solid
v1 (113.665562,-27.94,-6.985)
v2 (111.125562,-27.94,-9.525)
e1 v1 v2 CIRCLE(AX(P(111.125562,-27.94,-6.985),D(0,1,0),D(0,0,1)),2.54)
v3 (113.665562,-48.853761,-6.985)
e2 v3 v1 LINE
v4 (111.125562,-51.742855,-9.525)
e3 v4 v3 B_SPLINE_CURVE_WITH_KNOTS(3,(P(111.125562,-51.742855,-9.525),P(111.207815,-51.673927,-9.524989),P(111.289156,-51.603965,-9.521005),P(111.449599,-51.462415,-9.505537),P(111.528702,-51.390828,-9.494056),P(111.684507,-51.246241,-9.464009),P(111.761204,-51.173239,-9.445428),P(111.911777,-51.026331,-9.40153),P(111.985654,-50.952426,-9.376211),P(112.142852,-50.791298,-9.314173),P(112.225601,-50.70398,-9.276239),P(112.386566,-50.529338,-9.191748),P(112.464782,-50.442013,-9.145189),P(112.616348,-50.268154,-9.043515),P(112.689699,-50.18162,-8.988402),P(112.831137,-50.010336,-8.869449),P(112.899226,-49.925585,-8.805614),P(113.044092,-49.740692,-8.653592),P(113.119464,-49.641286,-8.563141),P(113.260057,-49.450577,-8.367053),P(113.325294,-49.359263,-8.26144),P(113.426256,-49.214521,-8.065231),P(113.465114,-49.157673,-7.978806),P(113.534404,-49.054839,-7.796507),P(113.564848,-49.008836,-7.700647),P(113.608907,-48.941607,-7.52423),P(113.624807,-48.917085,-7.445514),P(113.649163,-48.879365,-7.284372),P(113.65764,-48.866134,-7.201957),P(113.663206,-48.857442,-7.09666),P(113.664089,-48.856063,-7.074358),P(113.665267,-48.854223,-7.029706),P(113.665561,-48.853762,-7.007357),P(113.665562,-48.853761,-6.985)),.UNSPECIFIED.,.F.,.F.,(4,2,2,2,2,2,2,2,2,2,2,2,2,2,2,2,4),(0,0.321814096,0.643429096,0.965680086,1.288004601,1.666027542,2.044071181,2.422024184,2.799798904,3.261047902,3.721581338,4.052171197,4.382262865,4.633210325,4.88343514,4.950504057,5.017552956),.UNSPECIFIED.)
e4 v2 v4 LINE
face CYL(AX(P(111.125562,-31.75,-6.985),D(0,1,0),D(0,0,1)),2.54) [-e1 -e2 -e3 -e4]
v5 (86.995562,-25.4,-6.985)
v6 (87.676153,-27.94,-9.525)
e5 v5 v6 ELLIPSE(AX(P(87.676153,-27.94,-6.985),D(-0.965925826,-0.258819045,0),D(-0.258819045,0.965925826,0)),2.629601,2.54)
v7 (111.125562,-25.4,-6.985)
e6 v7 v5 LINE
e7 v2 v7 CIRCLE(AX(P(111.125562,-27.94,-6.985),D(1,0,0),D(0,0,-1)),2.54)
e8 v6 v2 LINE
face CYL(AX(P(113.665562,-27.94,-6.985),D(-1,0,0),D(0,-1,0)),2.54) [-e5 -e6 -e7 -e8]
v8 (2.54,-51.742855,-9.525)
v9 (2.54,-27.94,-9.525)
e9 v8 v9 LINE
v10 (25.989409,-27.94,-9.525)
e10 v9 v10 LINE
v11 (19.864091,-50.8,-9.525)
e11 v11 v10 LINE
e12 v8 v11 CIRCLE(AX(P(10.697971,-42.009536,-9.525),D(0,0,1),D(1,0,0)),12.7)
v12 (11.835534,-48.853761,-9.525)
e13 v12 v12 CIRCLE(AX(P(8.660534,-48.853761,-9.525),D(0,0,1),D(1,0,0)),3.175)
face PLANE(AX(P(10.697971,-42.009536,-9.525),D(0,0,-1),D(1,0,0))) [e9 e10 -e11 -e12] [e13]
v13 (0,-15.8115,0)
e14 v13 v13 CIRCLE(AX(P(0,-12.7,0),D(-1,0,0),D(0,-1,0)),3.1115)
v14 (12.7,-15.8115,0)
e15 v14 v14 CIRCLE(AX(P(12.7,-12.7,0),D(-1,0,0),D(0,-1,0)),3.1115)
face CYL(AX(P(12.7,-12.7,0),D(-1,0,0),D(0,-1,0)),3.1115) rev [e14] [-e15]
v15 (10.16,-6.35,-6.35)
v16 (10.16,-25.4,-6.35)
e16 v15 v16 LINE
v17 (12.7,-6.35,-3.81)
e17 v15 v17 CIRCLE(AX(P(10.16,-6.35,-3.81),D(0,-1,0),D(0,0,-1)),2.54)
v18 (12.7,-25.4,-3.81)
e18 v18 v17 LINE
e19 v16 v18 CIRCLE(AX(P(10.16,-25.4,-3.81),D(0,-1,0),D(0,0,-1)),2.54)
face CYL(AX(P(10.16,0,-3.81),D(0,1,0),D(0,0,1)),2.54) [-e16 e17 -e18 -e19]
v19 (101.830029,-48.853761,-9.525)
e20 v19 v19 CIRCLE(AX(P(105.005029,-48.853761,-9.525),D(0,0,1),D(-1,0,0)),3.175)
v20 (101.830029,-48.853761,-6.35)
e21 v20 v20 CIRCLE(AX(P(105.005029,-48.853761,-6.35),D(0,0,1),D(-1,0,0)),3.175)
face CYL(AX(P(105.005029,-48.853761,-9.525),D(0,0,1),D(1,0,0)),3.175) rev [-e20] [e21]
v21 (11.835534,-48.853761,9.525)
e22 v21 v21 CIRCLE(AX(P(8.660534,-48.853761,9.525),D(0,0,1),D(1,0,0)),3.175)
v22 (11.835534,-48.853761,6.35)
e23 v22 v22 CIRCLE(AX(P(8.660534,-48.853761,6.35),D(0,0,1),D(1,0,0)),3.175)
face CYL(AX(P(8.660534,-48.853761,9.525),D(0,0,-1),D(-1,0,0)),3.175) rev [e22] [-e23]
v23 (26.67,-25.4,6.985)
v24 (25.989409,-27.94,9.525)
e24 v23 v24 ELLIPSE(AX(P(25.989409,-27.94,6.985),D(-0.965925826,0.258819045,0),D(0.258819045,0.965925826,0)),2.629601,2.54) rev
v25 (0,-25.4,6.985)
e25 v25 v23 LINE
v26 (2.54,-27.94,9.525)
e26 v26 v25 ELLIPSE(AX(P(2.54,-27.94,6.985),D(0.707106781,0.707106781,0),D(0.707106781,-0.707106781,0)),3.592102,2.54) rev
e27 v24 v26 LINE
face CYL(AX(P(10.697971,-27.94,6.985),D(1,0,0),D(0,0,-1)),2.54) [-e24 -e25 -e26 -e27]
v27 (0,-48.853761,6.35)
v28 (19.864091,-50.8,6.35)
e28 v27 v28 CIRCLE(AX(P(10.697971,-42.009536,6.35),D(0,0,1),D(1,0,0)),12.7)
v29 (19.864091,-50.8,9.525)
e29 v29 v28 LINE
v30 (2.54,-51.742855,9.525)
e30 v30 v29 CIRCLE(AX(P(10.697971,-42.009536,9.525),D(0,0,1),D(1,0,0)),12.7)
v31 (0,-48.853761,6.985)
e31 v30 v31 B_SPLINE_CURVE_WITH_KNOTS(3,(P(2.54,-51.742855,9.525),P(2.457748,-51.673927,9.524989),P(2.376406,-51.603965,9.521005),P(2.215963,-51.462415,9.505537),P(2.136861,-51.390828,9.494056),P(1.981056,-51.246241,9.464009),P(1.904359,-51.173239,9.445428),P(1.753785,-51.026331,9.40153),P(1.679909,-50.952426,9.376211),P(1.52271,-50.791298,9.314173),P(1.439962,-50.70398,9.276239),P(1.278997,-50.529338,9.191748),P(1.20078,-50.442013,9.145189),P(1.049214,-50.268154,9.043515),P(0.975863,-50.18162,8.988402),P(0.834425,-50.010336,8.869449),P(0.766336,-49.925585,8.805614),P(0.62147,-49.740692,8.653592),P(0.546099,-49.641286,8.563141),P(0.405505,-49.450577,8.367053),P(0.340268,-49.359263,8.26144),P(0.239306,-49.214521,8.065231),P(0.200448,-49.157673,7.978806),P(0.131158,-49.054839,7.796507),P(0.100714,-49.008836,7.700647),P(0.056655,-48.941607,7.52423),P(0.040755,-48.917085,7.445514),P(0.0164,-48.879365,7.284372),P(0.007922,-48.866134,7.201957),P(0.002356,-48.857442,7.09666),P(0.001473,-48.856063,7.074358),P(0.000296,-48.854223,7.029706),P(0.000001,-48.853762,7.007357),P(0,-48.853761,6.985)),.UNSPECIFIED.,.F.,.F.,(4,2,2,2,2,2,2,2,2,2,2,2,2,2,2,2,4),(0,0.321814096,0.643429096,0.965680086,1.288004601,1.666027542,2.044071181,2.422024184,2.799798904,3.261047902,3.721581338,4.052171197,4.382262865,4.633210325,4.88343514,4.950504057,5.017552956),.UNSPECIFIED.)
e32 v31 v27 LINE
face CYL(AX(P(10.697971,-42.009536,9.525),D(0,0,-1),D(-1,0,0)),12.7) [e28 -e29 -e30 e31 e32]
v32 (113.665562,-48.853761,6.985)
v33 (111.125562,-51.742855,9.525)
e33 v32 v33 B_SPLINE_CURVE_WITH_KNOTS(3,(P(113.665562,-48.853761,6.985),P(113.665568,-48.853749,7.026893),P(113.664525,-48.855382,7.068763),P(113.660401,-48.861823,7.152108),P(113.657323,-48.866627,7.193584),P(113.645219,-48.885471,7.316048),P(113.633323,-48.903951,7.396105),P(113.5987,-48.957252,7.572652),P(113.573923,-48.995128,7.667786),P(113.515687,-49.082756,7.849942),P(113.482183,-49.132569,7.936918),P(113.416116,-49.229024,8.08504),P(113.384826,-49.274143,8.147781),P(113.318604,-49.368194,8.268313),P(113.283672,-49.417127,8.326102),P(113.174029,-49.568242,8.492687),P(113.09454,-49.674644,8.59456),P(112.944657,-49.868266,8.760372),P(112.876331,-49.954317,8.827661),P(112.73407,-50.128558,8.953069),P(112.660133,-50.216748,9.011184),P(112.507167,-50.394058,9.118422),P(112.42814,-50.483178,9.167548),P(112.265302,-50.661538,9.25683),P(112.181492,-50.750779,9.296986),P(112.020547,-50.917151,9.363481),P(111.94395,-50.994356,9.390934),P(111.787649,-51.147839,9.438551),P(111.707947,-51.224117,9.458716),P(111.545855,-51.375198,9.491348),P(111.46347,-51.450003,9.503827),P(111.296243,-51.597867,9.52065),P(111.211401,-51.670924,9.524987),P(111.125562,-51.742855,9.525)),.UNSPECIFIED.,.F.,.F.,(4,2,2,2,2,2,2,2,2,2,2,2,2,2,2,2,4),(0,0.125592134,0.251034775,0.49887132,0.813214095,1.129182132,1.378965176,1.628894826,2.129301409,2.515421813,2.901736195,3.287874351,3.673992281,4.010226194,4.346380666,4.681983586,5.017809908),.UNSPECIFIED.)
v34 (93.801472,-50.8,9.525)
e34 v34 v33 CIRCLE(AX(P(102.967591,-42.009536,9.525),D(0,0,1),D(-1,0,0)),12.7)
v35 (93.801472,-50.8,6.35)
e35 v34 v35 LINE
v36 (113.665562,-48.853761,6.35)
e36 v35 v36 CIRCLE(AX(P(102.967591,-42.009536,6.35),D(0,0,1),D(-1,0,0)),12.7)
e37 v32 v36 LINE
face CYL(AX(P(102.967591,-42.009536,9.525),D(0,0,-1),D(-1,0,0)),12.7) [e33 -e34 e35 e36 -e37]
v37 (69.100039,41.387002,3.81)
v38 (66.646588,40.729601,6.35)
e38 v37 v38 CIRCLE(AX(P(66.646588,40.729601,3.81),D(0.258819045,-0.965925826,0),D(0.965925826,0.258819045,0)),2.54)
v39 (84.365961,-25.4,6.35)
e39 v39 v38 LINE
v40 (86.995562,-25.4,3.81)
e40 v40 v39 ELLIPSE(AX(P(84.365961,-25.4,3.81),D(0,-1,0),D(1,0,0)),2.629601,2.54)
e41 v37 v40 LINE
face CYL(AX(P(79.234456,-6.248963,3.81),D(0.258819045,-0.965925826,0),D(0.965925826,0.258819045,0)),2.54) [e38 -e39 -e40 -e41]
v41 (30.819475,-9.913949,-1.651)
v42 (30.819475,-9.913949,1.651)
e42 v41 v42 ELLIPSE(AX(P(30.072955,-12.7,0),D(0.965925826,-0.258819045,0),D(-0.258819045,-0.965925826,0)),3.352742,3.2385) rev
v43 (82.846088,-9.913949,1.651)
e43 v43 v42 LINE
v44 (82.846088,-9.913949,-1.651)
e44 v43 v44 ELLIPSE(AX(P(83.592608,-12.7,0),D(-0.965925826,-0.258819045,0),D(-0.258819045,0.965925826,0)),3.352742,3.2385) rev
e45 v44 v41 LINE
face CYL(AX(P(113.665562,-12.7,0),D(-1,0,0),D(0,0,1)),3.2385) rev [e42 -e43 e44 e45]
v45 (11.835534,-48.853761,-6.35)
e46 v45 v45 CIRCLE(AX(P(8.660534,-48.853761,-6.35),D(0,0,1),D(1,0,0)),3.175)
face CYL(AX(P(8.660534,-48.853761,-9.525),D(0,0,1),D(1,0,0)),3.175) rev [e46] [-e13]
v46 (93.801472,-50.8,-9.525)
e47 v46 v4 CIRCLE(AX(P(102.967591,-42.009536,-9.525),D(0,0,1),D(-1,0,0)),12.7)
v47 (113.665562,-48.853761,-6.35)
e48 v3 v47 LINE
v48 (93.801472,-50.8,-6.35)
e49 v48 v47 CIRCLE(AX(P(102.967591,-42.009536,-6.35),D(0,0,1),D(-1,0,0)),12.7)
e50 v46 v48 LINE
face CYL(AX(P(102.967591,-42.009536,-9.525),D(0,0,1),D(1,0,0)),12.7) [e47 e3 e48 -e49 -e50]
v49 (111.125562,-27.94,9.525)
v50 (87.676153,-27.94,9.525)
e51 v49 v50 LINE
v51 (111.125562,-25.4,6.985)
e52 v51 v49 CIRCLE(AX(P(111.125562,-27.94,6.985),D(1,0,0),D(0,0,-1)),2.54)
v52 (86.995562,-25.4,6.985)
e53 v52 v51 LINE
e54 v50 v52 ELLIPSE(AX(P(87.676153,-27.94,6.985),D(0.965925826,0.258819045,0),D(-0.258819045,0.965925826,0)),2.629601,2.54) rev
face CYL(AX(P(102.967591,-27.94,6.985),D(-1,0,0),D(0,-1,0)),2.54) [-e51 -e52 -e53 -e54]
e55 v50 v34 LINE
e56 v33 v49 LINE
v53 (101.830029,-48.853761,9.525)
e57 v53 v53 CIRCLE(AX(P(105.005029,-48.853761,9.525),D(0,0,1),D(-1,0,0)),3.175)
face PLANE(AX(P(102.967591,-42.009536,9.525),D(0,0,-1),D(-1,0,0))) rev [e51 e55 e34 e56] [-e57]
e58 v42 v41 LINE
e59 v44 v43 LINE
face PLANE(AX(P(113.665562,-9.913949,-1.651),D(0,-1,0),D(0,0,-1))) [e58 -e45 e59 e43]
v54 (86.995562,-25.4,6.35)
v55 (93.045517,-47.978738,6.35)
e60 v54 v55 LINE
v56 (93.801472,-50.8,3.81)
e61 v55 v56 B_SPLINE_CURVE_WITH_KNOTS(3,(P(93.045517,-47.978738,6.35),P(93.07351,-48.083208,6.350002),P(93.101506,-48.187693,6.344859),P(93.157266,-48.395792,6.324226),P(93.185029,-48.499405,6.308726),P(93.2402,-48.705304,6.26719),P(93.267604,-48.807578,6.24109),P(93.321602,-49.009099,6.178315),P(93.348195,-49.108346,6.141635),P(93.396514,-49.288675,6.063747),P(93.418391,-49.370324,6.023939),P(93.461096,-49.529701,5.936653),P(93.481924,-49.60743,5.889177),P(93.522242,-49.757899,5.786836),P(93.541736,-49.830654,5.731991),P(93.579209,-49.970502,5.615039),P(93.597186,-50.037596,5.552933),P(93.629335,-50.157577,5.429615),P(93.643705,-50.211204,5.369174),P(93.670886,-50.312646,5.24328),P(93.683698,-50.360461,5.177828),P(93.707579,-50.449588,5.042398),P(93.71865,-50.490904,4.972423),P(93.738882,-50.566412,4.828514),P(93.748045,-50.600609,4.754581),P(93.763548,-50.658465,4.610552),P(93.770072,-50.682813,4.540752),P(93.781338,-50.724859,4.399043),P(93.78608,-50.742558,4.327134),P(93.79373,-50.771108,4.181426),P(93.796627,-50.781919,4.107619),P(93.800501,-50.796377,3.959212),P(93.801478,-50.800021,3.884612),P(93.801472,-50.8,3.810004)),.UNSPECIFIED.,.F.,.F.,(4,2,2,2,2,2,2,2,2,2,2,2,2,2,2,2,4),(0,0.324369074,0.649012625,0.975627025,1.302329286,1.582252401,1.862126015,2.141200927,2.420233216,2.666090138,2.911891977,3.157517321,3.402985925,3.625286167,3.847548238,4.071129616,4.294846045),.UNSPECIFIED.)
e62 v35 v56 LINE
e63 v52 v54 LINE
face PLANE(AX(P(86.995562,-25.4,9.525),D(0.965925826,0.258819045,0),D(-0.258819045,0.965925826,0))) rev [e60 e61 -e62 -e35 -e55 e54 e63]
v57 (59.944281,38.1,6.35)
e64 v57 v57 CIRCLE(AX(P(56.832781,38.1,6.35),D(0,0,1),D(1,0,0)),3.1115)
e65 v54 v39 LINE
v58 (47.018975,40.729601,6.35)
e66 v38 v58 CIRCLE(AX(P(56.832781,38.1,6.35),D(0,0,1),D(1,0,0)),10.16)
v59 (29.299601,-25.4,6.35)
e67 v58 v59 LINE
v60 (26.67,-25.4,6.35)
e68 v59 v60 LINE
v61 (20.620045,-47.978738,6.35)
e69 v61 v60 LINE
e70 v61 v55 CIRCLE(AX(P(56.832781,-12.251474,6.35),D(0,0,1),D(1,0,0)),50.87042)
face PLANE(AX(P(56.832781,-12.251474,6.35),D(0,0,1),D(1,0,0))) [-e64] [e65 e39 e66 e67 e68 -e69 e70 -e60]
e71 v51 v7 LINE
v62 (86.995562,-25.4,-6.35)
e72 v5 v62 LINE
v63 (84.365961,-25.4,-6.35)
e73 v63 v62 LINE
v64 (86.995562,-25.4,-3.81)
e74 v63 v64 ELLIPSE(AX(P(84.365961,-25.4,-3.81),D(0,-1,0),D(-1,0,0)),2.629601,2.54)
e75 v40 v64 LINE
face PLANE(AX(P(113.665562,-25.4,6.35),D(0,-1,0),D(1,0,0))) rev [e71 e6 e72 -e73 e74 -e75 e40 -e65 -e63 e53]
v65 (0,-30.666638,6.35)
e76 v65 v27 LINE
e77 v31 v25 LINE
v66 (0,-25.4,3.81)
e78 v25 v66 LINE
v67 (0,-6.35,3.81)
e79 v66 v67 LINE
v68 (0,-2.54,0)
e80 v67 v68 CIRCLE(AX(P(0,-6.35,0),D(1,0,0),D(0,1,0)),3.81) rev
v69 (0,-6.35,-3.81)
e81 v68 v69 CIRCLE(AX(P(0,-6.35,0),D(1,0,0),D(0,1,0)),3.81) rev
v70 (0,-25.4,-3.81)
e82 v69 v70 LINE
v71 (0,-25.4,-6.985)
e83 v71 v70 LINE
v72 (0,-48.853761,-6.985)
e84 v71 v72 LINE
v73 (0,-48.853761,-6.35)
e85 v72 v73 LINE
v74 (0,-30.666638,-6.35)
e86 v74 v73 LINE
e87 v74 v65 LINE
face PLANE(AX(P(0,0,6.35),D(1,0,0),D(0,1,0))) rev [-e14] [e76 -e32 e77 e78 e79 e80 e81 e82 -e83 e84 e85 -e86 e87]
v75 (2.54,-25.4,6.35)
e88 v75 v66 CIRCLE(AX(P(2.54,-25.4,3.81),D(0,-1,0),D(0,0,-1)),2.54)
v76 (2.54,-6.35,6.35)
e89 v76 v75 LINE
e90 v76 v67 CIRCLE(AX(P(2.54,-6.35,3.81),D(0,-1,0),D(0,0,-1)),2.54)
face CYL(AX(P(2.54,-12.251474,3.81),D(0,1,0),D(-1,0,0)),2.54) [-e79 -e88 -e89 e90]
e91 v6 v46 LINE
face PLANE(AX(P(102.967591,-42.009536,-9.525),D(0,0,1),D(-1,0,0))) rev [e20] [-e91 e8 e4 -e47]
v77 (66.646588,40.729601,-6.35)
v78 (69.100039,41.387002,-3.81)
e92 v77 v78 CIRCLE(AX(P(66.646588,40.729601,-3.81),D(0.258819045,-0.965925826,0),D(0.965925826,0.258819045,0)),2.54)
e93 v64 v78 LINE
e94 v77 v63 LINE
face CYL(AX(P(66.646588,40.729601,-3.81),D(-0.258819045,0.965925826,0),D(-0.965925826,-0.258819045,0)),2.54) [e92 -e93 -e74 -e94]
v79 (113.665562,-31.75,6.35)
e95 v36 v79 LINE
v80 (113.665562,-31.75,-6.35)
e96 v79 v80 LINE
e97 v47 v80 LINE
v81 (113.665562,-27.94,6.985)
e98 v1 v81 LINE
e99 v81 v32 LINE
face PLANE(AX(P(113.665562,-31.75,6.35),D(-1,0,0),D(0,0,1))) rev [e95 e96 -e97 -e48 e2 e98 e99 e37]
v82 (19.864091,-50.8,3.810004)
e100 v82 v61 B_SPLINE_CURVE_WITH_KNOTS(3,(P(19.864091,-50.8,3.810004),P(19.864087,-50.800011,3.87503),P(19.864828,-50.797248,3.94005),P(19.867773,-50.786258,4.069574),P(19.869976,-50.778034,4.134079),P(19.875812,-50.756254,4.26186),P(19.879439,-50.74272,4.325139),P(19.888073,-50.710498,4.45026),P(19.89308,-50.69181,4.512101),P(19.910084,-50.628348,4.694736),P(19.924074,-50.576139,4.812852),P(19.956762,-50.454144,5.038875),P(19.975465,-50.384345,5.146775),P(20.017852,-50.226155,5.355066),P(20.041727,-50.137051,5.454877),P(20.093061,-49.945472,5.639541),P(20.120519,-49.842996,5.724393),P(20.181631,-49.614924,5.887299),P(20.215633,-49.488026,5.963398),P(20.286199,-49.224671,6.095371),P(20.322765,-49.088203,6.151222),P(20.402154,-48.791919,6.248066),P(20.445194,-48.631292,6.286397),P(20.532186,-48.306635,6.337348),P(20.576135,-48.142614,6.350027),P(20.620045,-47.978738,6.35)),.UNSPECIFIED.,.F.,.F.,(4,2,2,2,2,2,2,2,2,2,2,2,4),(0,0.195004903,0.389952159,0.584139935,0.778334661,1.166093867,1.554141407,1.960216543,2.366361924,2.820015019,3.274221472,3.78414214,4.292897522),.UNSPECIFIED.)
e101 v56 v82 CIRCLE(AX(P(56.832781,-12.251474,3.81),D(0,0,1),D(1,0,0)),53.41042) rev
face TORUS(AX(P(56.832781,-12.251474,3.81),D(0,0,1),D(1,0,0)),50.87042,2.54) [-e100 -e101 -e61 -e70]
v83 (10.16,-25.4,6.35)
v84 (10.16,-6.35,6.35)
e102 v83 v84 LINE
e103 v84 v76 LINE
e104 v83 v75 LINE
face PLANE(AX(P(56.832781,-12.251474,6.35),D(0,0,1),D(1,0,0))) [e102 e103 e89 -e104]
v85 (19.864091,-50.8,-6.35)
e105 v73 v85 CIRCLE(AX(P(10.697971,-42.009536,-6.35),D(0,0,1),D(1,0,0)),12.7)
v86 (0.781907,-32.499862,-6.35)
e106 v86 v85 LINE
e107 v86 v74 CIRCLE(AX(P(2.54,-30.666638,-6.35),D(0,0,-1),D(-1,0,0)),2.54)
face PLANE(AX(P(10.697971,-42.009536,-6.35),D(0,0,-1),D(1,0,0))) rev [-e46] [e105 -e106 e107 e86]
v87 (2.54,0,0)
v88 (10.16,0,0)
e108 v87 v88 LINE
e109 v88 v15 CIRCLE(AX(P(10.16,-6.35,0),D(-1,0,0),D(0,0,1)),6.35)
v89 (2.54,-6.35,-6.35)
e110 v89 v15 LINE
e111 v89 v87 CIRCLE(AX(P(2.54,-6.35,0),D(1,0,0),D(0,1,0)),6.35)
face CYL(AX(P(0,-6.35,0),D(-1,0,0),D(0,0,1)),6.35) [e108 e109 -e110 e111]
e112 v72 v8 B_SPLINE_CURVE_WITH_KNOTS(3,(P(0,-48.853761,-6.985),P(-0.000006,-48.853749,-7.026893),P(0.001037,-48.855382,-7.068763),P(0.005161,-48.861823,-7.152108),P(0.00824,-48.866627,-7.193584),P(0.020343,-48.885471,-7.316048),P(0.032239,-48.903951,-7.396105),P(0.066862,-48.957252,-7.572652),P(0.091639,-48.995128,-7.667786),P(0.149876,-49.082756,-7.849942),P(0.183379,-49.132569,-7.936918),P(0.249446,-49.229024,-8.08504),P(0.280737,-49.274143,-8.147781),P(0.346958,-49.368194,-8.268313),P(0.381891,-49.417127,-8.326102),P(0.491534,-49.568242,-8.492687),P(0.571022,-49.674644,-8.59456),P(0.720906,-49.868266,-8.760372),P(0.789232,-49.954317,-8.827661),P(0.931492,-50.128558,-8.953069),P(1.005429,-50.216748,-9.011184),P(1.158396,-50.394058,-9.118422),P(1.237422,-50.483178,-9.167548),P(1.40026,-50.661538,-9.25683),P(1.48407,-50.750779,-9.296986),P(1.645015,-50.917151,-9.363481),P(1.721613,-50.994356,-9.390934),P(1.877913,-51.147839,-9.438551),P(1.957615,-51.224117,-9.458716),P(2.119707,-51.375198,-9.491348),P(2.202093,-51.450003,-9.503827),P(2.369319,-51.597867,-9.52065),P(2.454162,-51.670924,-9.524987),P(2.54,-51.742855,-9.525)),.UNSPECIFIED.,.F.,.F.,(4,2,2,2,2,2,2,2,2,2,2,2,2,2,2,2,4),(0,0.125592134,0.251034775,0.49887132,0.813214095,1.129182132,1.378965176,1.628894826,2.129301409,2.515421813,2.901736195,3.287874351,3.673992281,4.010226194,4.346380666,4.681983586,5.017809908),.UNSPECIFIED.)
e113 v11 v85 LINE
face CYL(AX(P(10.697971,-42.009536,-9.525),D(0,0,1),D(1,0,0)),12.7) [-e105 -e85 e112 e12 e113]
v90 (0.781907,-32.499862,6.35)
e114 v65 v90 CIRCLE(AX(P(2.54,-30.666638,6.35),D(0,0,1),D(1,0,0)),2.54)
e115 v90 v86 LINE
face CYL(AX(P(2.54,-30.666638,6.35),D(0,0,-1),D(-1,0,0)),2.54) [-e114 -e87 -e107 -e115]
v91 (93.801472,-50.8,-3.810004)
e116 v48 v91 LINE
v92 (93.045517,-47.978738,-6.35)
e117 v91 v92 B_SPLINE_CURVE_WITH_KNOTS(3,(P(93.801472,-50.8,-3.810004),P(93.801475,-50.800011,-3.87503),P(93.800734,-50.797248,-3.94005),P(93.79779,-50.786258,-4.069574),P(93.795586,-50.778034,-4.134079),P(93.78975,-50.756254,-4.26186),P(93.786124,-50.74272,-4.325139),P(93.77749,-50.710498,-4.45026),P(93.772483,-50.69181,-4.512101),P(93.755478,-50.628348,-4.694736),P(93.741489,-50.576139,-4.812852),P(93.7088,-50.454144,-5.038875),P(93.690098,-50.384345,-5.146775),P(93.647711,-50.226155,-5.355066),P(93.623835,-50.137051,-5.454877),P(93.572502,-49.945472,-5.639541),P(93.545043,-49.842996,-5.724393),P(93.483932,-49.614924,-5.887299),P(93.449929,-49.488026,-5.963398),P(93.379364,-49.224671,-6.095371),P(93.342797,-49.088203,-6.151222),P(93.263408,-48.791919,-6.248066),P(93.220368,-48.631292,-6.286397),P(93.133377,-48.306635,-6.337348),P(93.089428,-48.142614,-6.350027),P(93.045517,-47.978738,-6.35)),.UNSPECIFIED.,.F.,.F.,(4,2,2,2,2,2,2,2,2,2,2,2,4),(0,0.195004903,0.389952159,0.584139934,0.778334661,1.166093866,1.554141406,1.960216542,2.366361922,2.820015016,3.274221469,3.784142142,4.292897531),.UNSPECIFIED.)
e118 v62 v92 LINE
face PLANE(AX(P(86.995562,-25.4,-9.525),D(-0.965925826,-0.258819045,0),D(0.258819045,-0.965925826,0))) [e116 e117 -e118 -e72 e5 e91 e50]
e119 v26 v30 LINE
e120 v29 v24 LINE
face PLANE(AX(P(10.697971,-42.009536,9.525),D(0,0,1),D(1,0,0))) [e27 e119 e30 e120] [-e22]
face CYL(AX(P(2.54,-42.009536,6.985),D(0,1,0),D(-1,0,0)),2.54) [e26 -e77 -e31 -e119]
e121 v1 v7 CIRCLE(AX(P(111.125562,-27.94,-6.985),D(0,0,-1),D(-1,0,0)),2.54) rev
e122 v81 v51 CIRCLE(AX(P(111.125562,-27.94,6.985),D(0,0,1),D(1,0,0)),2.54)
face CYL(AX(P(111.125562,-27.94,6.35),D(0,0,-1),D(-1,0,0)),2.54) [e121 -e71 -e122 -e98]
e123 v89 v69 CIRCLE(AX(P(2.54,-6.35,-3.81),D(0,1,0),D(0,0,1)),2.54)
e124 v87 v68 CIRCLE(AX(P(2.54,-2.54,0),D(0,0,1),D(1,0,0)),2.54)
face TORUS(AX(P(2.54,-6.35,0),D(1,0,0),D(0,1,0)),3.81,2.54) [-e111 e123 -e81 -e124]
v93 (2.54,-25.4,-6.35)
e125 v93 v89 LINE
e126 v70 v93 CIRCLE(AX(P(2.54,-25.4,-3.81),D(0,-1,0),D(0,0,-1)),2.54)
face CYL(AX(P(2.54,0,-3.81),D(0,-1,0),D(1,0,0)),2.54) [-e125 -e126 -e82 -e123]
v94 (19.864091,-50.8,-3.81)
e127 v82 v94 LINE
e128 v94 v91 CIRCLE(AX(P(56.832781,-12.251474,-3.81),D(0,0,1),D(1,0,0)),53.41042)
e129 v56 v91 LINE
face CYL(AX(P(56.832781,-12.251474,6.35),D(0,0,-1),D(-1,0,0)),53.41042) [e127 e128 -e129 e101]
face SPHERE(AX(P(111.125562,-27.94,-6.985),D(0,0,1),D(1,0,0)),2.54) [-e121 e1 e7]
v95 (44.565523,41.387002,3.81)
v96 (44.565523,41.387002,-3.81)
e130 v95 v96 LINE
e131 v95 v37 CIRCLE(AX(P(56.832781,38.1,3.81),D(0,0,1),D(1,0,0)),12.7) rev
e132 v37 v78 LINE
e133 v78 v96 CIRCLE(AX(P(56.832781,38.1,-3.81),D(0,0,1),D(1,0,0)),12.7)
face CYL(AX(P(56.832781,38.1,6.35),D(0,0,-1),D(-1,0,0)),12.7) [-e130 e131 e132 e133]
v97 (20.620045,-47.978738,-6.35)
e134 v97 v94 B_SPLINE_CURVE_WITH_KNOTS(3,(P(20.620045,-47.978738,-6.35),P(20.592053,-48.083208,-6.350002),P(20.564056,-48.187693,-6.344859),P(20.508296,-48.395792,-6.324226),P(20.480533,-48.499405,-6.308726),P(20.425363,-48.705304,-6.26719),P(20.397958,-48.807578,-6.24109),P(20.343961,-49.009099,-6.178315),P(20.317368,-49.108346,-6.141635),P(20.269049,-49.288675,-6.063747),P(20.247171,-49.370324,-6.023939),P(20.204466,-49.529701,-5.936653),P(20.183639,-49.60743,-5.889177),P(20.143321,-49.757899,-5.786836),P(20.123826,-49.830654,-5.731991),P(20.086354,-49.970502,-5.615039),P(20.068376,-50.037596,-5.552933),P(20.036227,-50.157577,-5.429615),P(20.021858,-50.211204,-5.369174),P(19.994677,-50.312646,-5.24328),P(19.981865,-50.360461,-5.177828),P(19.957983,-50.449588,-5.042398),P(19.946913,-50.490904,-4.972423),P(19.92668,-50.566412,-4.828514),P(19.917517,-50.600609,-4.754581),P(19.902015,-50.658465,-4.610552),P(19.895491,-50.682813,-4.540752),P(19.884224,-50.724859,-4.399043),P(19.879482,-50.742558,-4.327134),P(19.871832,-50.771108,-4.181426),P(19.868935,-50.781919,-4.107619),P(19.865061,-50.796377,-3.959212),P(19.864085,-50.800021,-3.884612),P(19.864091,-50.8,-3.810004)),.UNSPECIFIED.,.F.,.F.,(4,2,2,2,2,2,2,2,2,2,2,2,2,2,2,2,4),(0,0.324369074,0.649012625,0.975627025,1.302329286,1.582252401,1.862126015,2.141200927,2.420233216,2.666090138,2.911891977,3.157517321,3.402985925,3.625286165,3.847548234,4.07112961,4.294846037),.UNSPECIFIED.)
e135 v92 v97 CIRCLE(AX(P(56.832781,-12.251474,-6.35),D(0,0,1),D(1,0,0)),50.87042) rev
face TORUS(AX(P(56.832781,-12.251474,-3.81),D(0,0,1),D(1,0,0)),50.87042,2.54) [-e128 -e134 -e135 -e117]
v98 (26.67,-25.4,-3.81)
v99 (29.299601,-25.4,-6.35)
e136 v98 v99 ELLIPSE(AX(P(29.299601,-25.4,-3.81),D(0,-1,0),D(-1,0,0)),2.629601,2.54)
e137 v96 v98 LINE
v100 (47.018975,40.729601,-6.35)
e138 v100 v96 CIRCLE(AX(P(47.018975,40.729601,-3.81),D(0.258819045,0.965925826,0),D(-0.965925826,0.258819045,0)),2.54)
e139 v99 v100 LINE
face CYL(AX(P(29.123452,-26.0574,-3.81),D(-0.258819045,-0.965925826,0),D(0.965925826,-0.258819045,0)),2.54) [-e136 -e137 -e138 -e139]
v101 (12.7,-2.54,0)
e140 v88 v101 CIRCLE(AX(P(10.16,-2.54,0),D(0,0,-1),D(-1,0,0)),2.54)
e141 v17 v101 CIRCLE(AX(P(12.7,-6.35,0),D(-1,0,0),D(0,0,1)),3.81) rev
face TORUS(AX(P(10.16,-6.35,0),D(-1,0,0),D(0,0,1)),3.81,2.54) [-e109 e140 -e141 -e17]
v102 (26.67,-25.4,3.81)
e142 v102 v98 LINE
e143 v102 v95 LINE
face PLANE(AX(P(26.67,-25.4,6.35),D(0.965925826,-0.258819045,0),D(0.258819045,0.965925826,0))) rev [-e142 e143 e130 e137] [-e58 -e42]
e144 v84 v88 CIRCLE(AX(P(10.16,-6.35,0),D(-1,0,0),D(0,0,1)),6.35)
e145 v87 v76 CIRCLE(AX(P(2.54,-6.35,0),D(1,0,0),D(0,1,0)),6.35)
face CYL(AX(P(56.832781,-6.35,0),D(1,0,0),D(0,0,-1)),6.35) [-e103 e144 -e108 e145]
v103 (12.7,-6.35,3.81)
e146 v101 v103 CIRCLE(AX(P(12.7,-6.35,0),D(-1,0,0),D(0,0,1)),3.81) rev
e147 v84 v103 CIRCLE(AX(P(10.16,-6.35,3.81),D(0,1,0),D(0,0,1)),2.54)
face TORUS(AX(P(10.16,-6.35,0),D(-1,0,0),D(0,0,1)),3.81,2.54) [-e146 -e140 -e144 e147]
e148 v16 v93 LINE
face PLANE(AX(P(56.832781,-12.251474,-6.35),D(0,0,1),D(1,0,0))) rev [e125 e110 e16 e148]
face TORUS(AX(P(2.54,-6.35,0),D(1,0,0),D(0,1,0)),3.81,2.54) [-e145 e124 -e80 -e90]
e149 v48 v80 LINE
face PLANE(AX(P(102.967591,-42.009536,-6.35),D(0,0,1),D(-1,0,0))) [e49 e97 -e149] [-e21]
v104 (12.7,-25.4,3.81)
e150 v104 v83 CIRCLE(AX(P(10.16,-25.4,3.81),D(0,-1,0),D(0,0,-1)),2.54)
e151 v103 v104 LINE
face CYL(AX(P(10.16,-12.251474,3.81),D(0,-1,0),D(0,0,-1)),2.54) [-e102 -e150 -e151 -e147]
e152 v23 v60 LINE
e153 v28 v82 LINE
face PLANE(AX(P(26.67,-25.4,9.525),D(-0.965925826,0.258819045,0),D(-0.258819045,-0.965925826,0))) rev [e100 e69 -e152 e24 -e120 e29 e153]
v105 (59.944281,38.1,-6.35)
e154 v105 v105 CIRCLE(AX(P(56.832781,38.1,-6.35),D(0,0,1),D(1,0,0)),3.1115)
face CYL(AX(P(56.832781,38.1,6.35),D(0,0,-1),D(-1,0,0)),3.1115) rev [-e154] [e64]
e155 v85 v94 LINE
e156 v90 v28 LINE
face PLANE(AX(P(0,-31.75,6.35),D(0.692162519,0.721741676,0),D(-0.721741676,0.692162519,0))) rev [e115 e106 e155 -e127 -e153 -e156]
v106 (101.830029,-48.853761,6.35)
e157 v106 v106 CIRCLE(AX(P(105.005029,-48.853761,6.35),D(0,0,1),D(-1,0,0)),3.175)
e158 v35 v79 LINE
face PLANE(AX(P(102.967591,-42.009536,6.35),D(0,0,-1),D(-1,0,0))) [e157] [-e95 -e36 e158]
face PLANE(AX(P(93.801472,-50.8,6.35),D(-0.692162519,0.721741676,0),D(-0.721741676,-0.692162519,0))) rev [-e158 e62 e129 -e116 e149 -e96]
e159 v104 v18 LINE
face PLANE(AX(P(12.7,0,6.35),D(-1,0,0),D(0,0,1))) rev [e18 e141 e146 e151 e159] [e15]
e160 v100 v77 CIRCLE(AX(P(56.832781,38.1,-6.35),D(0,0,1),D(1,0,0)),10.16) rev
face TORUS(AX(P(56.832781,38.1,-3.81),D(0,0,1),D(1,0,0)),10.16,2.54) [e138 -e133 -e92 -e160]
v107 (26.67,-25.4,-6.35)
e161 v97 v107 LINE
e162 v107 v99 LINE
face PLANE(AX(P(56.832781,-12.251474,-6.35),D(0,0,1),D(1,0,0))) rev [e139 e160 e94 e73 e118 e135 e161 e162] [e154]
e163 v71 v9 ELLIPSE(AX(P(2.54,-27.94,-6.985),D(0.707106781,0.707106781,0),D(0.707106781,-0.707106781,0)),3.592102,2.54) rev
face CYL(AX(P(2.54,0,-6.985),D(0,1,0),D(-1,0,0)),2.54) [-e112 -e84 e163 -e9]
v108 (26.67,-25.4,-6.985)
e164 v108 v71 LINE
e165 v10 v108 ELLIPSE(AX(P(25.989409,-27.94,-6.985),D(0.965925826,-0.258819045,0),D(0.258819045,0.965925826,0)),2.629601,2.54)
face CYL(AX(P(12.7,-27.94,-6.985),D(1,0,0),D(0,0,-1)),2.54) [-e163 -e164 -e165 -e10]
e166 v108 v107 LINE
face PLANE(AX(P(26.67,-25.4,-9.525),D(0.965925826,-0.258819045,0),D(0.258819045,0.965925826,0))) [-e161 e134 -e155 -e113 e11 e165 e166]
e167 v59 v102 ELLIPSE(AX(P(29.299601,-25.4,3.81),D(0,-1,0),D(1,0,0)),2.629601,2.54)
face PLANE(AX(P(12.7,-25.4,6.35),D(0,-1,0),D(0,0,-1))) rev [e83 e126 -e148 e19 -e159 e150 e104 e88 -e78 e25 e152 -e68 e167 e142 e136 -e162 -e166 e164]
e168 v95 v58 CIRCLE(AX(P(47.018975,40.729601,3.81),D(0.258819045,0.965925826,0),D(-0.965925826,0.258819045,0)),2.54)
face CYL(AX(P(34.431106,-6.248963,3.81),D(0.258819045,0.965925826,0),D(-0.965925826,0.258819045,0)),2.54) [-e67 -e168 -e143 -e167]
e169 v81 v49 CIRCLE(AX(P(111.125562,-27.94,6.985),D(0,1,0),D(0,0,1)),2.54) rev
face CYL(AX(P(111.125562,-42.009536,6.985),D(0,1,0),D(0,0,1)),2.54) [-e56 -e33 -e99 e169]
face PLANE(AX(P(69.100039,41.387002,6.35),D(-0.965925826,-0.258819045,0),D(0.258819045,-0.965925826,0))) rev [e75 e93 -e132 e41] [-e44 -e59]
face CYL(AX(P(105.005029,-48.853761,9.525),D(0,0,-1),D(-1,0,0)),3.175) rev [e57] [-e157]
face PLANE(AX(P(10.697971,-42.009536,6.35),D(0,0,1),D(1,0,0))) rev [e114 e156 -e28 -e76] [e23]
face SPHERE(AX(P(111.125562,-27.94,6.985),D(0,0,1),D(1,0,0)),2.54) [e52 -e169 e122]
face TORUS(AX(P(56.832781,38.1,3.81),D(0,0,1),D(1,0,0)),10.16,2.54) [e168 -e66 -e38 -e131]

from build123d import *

# Parameters (mm, degrees)
SKETCH2_R           = 3.1115
BOSS_EXTRUDE1_DEPTH = 6.35
SKETCH3_R           = 3.1115
CUT_EXTRUDE1_DEPTH  = 12.7
CUT_EXTRUDE3_DEPTH  = 121.606183935
SKETCH9_R           = 3.175
BOSS_EXTRUDE2_DEPTH = 3.175
FILLET1_R           = 6.35
FILLET2_R           = 2.54


# Some blends are built 0.0001 mm under size
with BuildPart() as part:
    # Sketch2 → Boss-Extrude1 (new, symmetric)
    with BuildSketch(Plane.XY):
        with BuildLine():
            Line((26.67, -25.4), (44.565523217, 41.387001873))
            ThreePointArc((44.565523217, 41.387001873), (56.832781211, 50.8), (69.100039204, 41.387001873))
            Line((69.100039204, 41.387001873), (86.995562421, -25.4))
            Line((86.995562421, -25.4), (113.665562421, -25.4))
            Line((113.665562421, -25.4), (113.665562421, -31.75))
            Line((113.665562421, -31.75), (93.801471909, -50.8))
            ThreePointArc((93.801471909, -50.8), (56.832781211, -65.661893883), (19.864090512, -50.8))
            Line((19.864090512, -50.8), (0, -31.75))
            Line((0, -31.75), (0, 0))
            Line((0, 0), (12.7, 0))
            Line((12.7, 0), (12.7, -25.4))
            Line((12.7, -25.4), (26.67, -25.4))
        make_face()
        with Locations((56.832781211, 38.1)):
            Circle(SKETCH2_R, mode=Mode.SUBTRACT)
    extrude(amount=BOSS_EXTRUDE1_DEPTH, both=True)

    # Sketch3 → Cut-Extrude1 (cut)
    with BuildSketch(Plane.ZY):
        with Locations(Location((0, -12.7, 0), (0, 0, 270))):
            Circle(SKETCH3_R)
    extrude(amount=-CUT_EXTRUDE1_DEPTH, mode=Mode.SUBTRACT)

    # Sketch5 → Cut-Extrude3 (cut, through all)
    with BuildSketch(Plane(origin=(12.7, 0, 0), x_dir=(0, 0, -1), z_dir=(1, 0, 0))):
        with BuildLine():
            Line((1.651, -9.913948807), (-1.651, -9.913948807))
            ThreePointArc((-1.651, -9.913948807), (0, -15.9385), (1.651, -9.913948807))
        make_face()
    extrude(amount=CUT_EXTRUDE3_DEPTH, mode=Mode.SUBTRACT)

    # Sketch9 → Boss-Extrude2 (add)
    # profile 1 of 2: a face of its own
    with BuildSketch(Plane.XY.offset(6.35)):
        with BuildLine():
            Line((26.67, -25.4), (19.864090512, -50.8))
            ThreePointArc((19.864090512, -50.8), (9.459583385, -54.649013668), (0, -48.8537607))
            Line((0, -48.8537607), (0, -25.4))
            Line((0, -25.4), (26.67, -25.4))
        make_face()
        with Locations((8.660533834, -48.8537607)):
            Circle(SKETCH9_R, mode=Mode.SUBTRACT)
    # profile 2 of 2: a face of its own
    with BuildSketch(Plane.XY.offset(6.35)):
        with BuildLine():
            Line((113.665562421, -25.4), (86.995562421, -25.4))
            Line((86.995562421, -25.4), (93.801471909, -50.8))
            ThreePointArc((93.801471909, -50.8), (104.205979036, -54.649013668), (113.665562421, -48.8537607))
            Line((113.665562421, -48.8537607), (113.665562421, -25.4))
        make_face()
        with Locations(Location((105.005028588, -48.8537607, 0), (0, 0, 180))):
            Circle(SKETCH9_R, mode=Mode.SUBTRACT)
    boss_extrude2 = extrude(amount=BOSS_EXTRUDE2_DEPTH)

    # Mirror4: Boss-Extrude2 across plane
    add(boss_extrude2.mirror(Plane.XY))

    # Fillet1
    fillet1_edges = [part.edges().sort_by_distance(p)[0] for p in [
        (6.35, 0, -6.35),
        (6.35, 0, 6.35),
    ]]
    fillet(fillet1_edges, radius=FILLET1_R - 0.0001)  # a hair under: the kernel refuses the full size

    # Fillet2
    # the kernel refuses this fillet: 2.54 mm, written as the material it takes off along each edge
    with BuildSketch(Plane(origin=(111.125562421, -27.94, 6.985), x_dir=(0, 0, 1), z_dir=(0, 1, 0))) as fillet2_piece_1_section:
        Polygon((0, 0), (FILLET2_R * 1.02, 0), (FILLET2_R * 1.02, FILLET2_R * 1.02), (0, FILLET2_R * 1.02), align=None)
    fillet2_piece_1 = extrude(amount=FILLET2_R * 1.02, mode=Mode.PRIVATE)
    fillet2_piece_1 = fillet2_piece_1 - Plane(origin=(111.125562421, -27.94, 6.985), x_dir=(-0.7071067811865475, 0, -0.7071067811865475), z_dir=(0, 1, 0)) * Sphere(FILLET2_R, mode=Mode.PRIVATE)
    add(fillet2_piece_1, mode=Mode.SUBTRACT)
    with BuildSketch(Plane(origin=(111.125562421, -27.94, -6.985), x_dir=(0, 0, -1), z_dir=(0, 1, 0))) as fillet2_piece_2_section:
        Polygon((0, 0), (FILLET2_R * 1.02, 0), (FILLET2_R * 1.02, -FILLET2_R * 1.02), (0, -FILLET2_R * 1.02), align=None)
    fillet2_piece_2 = extrude(amount=FILLET2_R * 1.02, mode=Mode.PRIVATE)
    fillet2_piece_2 = fillet2_piece_2 - Plane(origin=(111.125562421, -27.94, -6.985), x_dir=(-0.7071067811865475, 0, 0.7071067811865475), z_dir=(0, 1, 0)) * Sphere(FILLET2_R, mode=Mode.PRIVATE)
    add(fillet2_piece_2, mode=Mode.SUBTRACT)
    with BuildSketch(Plane(origin=(12.7, -6.3499, -6.35), x_dir=(-1, 0, 0), z_dir=(0, -1, 0)), Plane(origin=(12.7, -6.3499, 6.35), x_dir=(0, 0, -1), z_dir=(0, -1, 0)), Plane(origin=(0, -25.4, 6.35), x_dir=(0, 0, -1), z_dir=(0, 1, 0)), Plane(origin=(0, -25.4, -6.35), x_dir=(1, 0, 0), z_dir=(0, 1, 0))) as fillet2_piece_3:
        with BuildLine():
            CenterArc((FILLET2_R, -FILLET2_R), FILLET2_R, 90, 90)
            Line((0, -FILLET2_R), (0, 0))
            Line((0, 0), (FILLET2_R, 0))
        make_face()
    extrude(amount=19.0501, mode=Mode.SUBTRACT)
    with BuildSketch(Plane(origin=(12.7, -6.3499, 0.0001), x_dir=(0, 1, 0), z_dir=(0, 0, -1))) as fillet2_piece_4:
        with BuildLine():
            CenterArc((6.3499 - FILLET2_R, -FILLET2_R), FILLET2_R, 0, 90)
            Line((6.3499, -FILLET2_R), (6.3499, 0))
            Line((6.3499, 0), (6.3499 - FILLET2_R, 0))
        make_face()
    revolve(axis=Axis((12.7, -6.3499, 0.0001), (1, 0, 0)), revolution_arc=90, mode=Mode.SUBTRACT)
    with BuildSketch(Plane(origin=(0, -6.3499, 0.0001), x_dir=(0, 1, 0), z_dir=(0, 0, -1))) as fillet2_piece_5:
        with BuildLine():
            CenterArc((6.3499 - FILLET2_R, FILLET2_R), FILLET2_R, 270, 90)
            Line((6.3499, FILLET2_R), (6.3499, 0))
            Line((6.3499, 0), (6.3499 - FILLET2_R, 0))
        make_face()
    revolve(axis=Axis((0, -6.3499, 0.0001), (1, 0, 0)), revolution_arc=90, mode=Mode.SUBTRACT)
    with BuildSketch(Plane(origin=(0, -6.3499, -0.0001), x_dir=(0, 0, -1), z_dir=(0, -1, 0))) as fillet2_piece_6:
        with BuildLine():
            CenterArc((6.3499 - FILLET2_R, FILLET2_R), FILLET2_R, 270, 90)
            Line((6.3499 - FILLET2_R, 0), (6.3499, 0))
            Line((6.3499, 0), (6.3499, FILLET2_R))
        make_face()
    revolve(axis=Axis((0, -6.3499, -0.0001), (1, 0, 0)), revolution_arc=90, mode=Mode.SUBTRACT)
    with BuildSketch(Plane(origin=(69.100039204, 41.387001873, -6.35), x_dir=(-0.9659258262890682, -0.2588190451025212, 0), z_dir=(0.2588190451025212, -0.9659258262890682, 0))) as fillet2_piece_7_section:
        with BuildLine():
            CenterArc((FILLET2_R, -FILLET2_R), FILLET2_R, 90, 90)
            Line((0, -FILLET2_R), (0, 0))
            Line((0, 0), (FILLET2_R, 0))
        make_face()
    fillet2_piece_7 = extrude(amount=75.4929922, mode=Mode.PRIVATE)
    fillet2_piece_7 = split(fillet2_piece_7, bisect_by=Plane(origin=(68.876104446, -25.4, -5.922360924), z_dir=(0, 1, 0)), keep=Keep.TOP, mode=Mode.PRIVATE)
    add(fillet2_piece_7, mode=Mode.SUBTRACT)
    with BuildSketch(Plane(origin=(56.832781211, 38.1, -6.35), x_dir=(-0.9659258262890699, 0.2588190451025148, 0), z_dir=(-0.2588190451025148, -0.9659258262890699, 0))) as fillet2_piece_8:
        with BuildLine():
            CenterArc((12.7 - FILLET2_R, -FILLET2_R), FILLET2_R, 0, 90)
            Line((12.7, -FILLET2_R), (12.7, 0))
            Line((12.7, 0), (12.7 - FILLET2_R, 0))
        make_face()
    revolve(axis=Axis((56.832781211, 38.1, -6.35), (0, 0, -1)), revolution_arc=150, mode=Mode.SUBTRACT)
    with BuildSketch(Plane(origin=(69.100039204, 41.387001873, 6.35), x_dir=(-0.9659258262890682, -0.2588190451025212, 0), z_dir=(0.2588190451025212, -0.9659258262890682, 0))) as fillet2_piece_9_section:
        with BuildLine():
            CenterArc((FILLET2_R, FILLET2_R), FILLET2_R, 180, 90)
            Line((0, FILLET2_R), (0, 0))
            Line((0, 0), (FILLET2_R, 0))
        make_face()
    fillet2_piece_9 = extrude(amount=75.4929922, mode=Mode.PRIVATE)
    fillet2_piece_9 = split(fillet2_piece_9, bisect_by=Plane(origin=(68.876104446, -25.4, 5.922360924), z_dir=(0, 1, 0)), keep=Keep.TOP, mode=Mode.PRIVATE)
    add(fillet2_piece_9, mode=Mode.SUBTRACT)
    with BuildSketch(Plane(origin=(56.832781211, 38.1, 6.35), x_dir=(-0.9659258262890699, 0.2588190451025148, 0), z_dir=(-0.2588190451025148, -0.9659258262890699, 0))) as fillet2_piece_10:
        with BuildLine():
            CenterArc((12.7 - FILLET2_R, FILLET2_R), FILLET2_R, 270, 90)
            Line((12.7 - FILLET2_R, 0), (12.7, 0))
            Line((12.7, 0), (12.7, FILLET2_R))
        make_face()
    revolve(axis=Axis((56.832781211, 38.1, 6.35), (0, 0, -1)), revolution_arc=150, mode=Mode.SUBTRACT)
    with BuildSketch(Plane(origin=(113.665562421, -55.2037607, 9.525), x_dir=(-1, 0, 0), z_dir=(0, 1, 0))) as fillet2_piece_11:
        with BuildLine():
            CenterArc((FILLET2_R, -FILLET2_R), FILLET2_R, 90, 90)
            Line((0, -FILLET2_R), (0, 0))
            Line((0, 0), (FILLET2_R, 0))
        make_face()
    extrude(amount=27.2637607, mode=Mode.SUBTRACT)
    with BuildSketch(Plane(origin=(113.665562421, -55.2037607, -9.525), x_dir=(-1, 0, 0), z_dir=(0, 1, 0))) as fillet2_piece_12:
        with BuildLine():
            CenterArc((FILLET2_R, FILLET2_R), FILLET2_R, 180, 90)
            Line((0, FILLET2_R), (0, 0))
            Line((0, 0), (FILLET2_R, 0))
        make_face()
    extrude(amount=27.2637607, mode=Mode.SUBTRACT)
    with BuildSketch(Plane(origin=(0, -31.75, 6.35), x_dir=(0, 1, 0), z_dir=(0, 0, -1))) as fillet2_piece_13:
        with BuildLine():
            CenterArc((FILLET2_R * 0.426520306378, FILLET2_R), FILLET2_R, 223.801535716, 46.198464284)
            Line((-FILLET2_R * 0.295221369742, FILLET2_R * 0.307837480825), (0, 0))
            Line((0, 0), (FILLET2_R * 0.426520306378, 0))
        make_face()
    extrude(amount=12.7, mode=Mode.SUBTRACT)
    with BuildSketch(Plane(origin=(0, -55.2037607, -9.525), x_dir=(0, 0, 1), z_dir=(0, 1, 0))) as fillet2_piece_14:
        with BuildLine():
            CenterArc((FILLET2_R, FILLET2_R), FILLET2_R, 180, 90)
            Line((0, FILLET2_R), (0, 0))
            Line((0, 0), (FILLET2_R, 0))
        make_face()
    extrude(amount=36.1537607, mode=Mode.SUBTRACT)
    with BuildSketch(Plane(origin=(0, -55.2037607, 9.525), x_dir=(0, 0, -1), z_dir=(0, 1, 0))) as fillet2_piece_15:
        with BuildLine():
            CenterArc((FILLET2_R, -FILLET2_R), FILLET2_R, 90, 90)
            Line((0, -FILLET2_R), (0, 0))
            Line((0, 0), (FILLET2_R, 0))
        make_face()
    extrude(amount=36.1537607, mode=Mode.SUBTRACT)
    with BuildSketch(Plane(origin=(56.832781211, -12.251474113, -6.35), x_dir=(0.7729114718935509, -0.6345138742496845, 0), z_dir=(0.6345138742496845, 0.7729114718935509, 0))) as fillet2_piece_16_section:
        with BuildLine():
            CenterArc((53.41041977 - FILLET2_R, -FILLET2_R), FILLET2_R, 0, 90)
            Line((53.41041977, -FILLET2_R), (53.41041977, 0))
            Line((53.41041977, 0), (53.41041977 - FILLET2_R, 0))
        make_face()
    fillet2_piece_16 = revolve(axis=Axis((56.832781211, -12.251474113, -6.35), (0, 0, -1)), revolution_arc=101.232122505, mode=Mode.PRIVATE)
    fillet2_piece_16 = split(fillet2_piece_16, bisect_by=Plane(origin=(25.007151117, -31.605836517, -6.009871091), z_dir=(0.9659258262890701, -0.2588190451025142, 0)), keep=Keep.TOP, mode=Mode.PRIVATE)
    fillet2_piece_16 = split(fillet2_piece_16, bisect_by=Plane(origin=(93.550754109, -49.864308433, -6.009871091), z_dir=(-0.96592582628907, -0.2588190451025145, 0)), keep=Keep.TOP, mode=Mode.PRIVATE)
    add(fillet2_piece_16, mode=Mode.SUBTRACT)
    with BuildSketch(Plane(origin=(56.832781211, -12.251474113, 6.35), x_dir=(0.7729114718935509, -0.6345138742496845, 0), z_dir=(0.6345138742496845, 0.7729114718935509, 0))) as fillet2_piece_17_section:
        with BuildLine():
            CenterArc((53.41041977 - FILLET2_R, FILLET2_R), FILLET2_R, 270, 90)
            Line((53.41041977, FILLET2_R), (53.41041977, 0))
            Line((53.41041977, 0), (53.41041977 - FILLET2_R, 0))
        make_face()
    fillet2_piece_17 = revolve(axis=Axis((56.832781211, -12.251474113, 6.35), (0, 0, -1)), revolution_arc=101.232122505, mode=Mode.PRIVATE)
    fillet2_piece_17 = split(fillet2_piece_17, bisect_by=Plane(origin=(25.007151117, -31.605836517, 6.009871091), z_dir=(0.9659258262890701, -0.2588190451025142, 0)), keep=Keep.TOP, mode=Mode.PRIVATE)
    fillet2_piece_17 = split(fillet2_piece_17, bisect_by=Plane(origin=(93.550754109, -49.864308433, 6.009871091), z_dir=(-0.96592582628907, -0.2588190451025145, 0)), keep=Keep.TOP, mode=Mode.PRIVATE)
    add(fillet2_piece_17, mode=Mode.SUBTRACT)
    with BuildSketch(Plane(origin=(111.125562421, -25.4, -9.525), x_dir=(0, 0, 1), z_dir=(-1, 0, 0))) as fillet2_piece_18:
        with BuildLine():
            CenterArc((FILLET2_R, -FILLET2_R), FILLET2_R, 90, 90)
            Line((0, -FILLET2_R), (0, 0))
            Line((0, 0), (FILLET2_R, 0))
        make_face()
    extrude(amount=30.48, mode=Mode.SUBTRACT)
    with BuildSketch(Plane(origin=(113.665562421, -25.4, -6.985), x_dir=(-1, 0, 0), z_dir=(0, 0, 1))) as fillet2_piece_19:
        with BuildLine():
            CenterArc((FILLET2_R, FILLET2_R), FILLET2_R, 180, 90)
            Line((0, FILLET2_R), (0, 0))
            Line((0, 0), (FILLET2_R, 0))
        make_face()
    extrude(amount=13.97, mode=Mode.SUBTRACT)
    with BuildSketch(Plane(origin=(111.125562421, -25.4, 9.525), x_dir=(0, 0, -1), z_dir=(-1, 0, 0))) as fillet2_piece_20:
        with BuildLine():
            CenterArc((FILLET2_R, FILLET2_R), FILLET2_R, 180, 90)
            Line((0, FILLET2_R), (0, 0))
            Line((0, 0), (FILLET2_R, 0))
        make_face()
    extrude(amount=30.48, mode=Mode.SUBTRACT)
    with BuildSketch(Plane(origin=(12.7, -6.3499, -0.0001), x_dir=(0, 0, -1), z_dir=(0, -1, 0))) as fillet2_piece_21:
        with BuildLine():
            CenterArc((6.3499 - FILLET2_R, -FILLET2_R), FILLET2_R, 0, 90)
            Line((6.3499, -FILLET2_R), (6.3499, 0))
            Line((6.3499, 0), (6.3499 - FILLET2_R, 0))
        make_face()
    revolve(axis=Axis((12.7, -6.3499, -0.0001), (1, 0, 0)), revolution_arc=90, mode=Mode.SUBTRACT)
    with BuildSketch(Plane(origin=(-6.35, -25.4, -9.525), x_dir=(0, 0, 1), z_dir=(1, 0, 0))) as fillet2_piece_22:
        with BuildLine():
            CenterArc((FILLET2_R, FILLET2_R), FILLET2_R, 180, 90)
            Line((0, FILLET2_R), (0, 0))
            Line((0, 0), (FILLET2_R, 0))
        make_face()
    extrude(amount=39.37, mode=Mode.SUBTRACT)
    with BuildSketch(Plane(origin=(-6.35, -25.4, 9.525), x_dir=(0, 0, -1), z_dir=(1, 0, 0))) as fillet2_piece_23:
        with BuildLine():
            CenterArc((FILLET2_R, -FILLET2_R), FILLET2_R, 90, 90)
            Line((0, -FILLET2_R), (0, 0))
            Line((0, 0), (FILLET2_R, 0))
        make_face()
    extrude(amount=39.37, mode=Mode.SUBTRACT)
    with BuildSketch(Plane(origin=(25.026499064, -31.533628997, -6.35), x_dir=(0, 0, 1), z_dir=(0.25881904510251397, 0.9659258262890701, 0))) as fillet2_piece_24_section:
        with BuildLine():
            CenterArc((FILLET2_R, FILLET2_R), FILLET2_R, 180, 90)
            Line((0, FILLET2_R), (0, 0))
            Line((0, 0), (FILLET2_R, 0))
        make_face()
    fillet2_piece_24 = extrude(amount=75.4929922, mode=Mode.PRIVATE)
    fillet2_piece_24 = split(fillet2_piece_24, bisect_by=Plane(origin=(35.742506372, -25.4, -5.774922741), z_dir=(0, 1, 0)), keep=Keep.TOP, mode=Mode.PRIVATE)
    add(fillet2_piece_24, mode=Mode.SUBTRACT)
    with BuildSketch(Plane(origin=(25.026499064, -31.533628997, 6.35), x_dir=(0, 0, -1), z_dir=(0.25881904510251397, 0.9659258262890701, 0))) as fillet2_piece_25_section:
        with BuildLine():
            CenterArc((FILLET2_R, -FILLET2_R), FILLET2_R, 90, 90)
            Line((0, -FILLET2_R), (0, 0))
            Line((0, 0), (FILLET2_R, 0))
        make_face()
    fillet2_piece_25 = extrude(amount=75.4929922, mode=Mode.PRIVATE)
    fillet2_piece_25 = split(fillet2_piece_25, bisect_by=Plane(origin=(35.742506372, -25.4, 5.774922741), z_dir=(0, 1, 0)), keep=Keep.TOP, mode=Mode.PRIVATE)
    add(fillet2_piece_25, mode=Mode.SUBTRACT)
    with BuildSketch(Plane(origin=(12.7, 0, 0.0001), x_dir=(0, -1, 0), z_dir=(0, 0, -1))) as fillet2_piece_26:
        with BuildLine():
            CenterArc((FILLET2_R, FILLET2_R), FILLET2_R, 180, 90)
            Line((0, FILLET2_R), (0, 0))
            Line((0, 0), (FILLET2_R, 0))
        make_face()
    extrude(amount=0.0002, mode=Mode.SUBTRACT)
    with BuildSketch(Plane(origin=(0, 0, 0.0001), x_dir=(0, -1, 0), z_dir=(0, 0, -1))) as fillet2_piece_27:
        with BuildLine():
            CenterArc((FILLET2_R, -FILLET2_R), FILLET2_R, 90, 90)
            Line((0, -FILLET2_R), (0, 0))
            Line((0, 0), (FILLET2_R, 0))
        make_face()
    extrude(amount=0.0002, mode=Mode.SUBTRACT)


solid = part.part
